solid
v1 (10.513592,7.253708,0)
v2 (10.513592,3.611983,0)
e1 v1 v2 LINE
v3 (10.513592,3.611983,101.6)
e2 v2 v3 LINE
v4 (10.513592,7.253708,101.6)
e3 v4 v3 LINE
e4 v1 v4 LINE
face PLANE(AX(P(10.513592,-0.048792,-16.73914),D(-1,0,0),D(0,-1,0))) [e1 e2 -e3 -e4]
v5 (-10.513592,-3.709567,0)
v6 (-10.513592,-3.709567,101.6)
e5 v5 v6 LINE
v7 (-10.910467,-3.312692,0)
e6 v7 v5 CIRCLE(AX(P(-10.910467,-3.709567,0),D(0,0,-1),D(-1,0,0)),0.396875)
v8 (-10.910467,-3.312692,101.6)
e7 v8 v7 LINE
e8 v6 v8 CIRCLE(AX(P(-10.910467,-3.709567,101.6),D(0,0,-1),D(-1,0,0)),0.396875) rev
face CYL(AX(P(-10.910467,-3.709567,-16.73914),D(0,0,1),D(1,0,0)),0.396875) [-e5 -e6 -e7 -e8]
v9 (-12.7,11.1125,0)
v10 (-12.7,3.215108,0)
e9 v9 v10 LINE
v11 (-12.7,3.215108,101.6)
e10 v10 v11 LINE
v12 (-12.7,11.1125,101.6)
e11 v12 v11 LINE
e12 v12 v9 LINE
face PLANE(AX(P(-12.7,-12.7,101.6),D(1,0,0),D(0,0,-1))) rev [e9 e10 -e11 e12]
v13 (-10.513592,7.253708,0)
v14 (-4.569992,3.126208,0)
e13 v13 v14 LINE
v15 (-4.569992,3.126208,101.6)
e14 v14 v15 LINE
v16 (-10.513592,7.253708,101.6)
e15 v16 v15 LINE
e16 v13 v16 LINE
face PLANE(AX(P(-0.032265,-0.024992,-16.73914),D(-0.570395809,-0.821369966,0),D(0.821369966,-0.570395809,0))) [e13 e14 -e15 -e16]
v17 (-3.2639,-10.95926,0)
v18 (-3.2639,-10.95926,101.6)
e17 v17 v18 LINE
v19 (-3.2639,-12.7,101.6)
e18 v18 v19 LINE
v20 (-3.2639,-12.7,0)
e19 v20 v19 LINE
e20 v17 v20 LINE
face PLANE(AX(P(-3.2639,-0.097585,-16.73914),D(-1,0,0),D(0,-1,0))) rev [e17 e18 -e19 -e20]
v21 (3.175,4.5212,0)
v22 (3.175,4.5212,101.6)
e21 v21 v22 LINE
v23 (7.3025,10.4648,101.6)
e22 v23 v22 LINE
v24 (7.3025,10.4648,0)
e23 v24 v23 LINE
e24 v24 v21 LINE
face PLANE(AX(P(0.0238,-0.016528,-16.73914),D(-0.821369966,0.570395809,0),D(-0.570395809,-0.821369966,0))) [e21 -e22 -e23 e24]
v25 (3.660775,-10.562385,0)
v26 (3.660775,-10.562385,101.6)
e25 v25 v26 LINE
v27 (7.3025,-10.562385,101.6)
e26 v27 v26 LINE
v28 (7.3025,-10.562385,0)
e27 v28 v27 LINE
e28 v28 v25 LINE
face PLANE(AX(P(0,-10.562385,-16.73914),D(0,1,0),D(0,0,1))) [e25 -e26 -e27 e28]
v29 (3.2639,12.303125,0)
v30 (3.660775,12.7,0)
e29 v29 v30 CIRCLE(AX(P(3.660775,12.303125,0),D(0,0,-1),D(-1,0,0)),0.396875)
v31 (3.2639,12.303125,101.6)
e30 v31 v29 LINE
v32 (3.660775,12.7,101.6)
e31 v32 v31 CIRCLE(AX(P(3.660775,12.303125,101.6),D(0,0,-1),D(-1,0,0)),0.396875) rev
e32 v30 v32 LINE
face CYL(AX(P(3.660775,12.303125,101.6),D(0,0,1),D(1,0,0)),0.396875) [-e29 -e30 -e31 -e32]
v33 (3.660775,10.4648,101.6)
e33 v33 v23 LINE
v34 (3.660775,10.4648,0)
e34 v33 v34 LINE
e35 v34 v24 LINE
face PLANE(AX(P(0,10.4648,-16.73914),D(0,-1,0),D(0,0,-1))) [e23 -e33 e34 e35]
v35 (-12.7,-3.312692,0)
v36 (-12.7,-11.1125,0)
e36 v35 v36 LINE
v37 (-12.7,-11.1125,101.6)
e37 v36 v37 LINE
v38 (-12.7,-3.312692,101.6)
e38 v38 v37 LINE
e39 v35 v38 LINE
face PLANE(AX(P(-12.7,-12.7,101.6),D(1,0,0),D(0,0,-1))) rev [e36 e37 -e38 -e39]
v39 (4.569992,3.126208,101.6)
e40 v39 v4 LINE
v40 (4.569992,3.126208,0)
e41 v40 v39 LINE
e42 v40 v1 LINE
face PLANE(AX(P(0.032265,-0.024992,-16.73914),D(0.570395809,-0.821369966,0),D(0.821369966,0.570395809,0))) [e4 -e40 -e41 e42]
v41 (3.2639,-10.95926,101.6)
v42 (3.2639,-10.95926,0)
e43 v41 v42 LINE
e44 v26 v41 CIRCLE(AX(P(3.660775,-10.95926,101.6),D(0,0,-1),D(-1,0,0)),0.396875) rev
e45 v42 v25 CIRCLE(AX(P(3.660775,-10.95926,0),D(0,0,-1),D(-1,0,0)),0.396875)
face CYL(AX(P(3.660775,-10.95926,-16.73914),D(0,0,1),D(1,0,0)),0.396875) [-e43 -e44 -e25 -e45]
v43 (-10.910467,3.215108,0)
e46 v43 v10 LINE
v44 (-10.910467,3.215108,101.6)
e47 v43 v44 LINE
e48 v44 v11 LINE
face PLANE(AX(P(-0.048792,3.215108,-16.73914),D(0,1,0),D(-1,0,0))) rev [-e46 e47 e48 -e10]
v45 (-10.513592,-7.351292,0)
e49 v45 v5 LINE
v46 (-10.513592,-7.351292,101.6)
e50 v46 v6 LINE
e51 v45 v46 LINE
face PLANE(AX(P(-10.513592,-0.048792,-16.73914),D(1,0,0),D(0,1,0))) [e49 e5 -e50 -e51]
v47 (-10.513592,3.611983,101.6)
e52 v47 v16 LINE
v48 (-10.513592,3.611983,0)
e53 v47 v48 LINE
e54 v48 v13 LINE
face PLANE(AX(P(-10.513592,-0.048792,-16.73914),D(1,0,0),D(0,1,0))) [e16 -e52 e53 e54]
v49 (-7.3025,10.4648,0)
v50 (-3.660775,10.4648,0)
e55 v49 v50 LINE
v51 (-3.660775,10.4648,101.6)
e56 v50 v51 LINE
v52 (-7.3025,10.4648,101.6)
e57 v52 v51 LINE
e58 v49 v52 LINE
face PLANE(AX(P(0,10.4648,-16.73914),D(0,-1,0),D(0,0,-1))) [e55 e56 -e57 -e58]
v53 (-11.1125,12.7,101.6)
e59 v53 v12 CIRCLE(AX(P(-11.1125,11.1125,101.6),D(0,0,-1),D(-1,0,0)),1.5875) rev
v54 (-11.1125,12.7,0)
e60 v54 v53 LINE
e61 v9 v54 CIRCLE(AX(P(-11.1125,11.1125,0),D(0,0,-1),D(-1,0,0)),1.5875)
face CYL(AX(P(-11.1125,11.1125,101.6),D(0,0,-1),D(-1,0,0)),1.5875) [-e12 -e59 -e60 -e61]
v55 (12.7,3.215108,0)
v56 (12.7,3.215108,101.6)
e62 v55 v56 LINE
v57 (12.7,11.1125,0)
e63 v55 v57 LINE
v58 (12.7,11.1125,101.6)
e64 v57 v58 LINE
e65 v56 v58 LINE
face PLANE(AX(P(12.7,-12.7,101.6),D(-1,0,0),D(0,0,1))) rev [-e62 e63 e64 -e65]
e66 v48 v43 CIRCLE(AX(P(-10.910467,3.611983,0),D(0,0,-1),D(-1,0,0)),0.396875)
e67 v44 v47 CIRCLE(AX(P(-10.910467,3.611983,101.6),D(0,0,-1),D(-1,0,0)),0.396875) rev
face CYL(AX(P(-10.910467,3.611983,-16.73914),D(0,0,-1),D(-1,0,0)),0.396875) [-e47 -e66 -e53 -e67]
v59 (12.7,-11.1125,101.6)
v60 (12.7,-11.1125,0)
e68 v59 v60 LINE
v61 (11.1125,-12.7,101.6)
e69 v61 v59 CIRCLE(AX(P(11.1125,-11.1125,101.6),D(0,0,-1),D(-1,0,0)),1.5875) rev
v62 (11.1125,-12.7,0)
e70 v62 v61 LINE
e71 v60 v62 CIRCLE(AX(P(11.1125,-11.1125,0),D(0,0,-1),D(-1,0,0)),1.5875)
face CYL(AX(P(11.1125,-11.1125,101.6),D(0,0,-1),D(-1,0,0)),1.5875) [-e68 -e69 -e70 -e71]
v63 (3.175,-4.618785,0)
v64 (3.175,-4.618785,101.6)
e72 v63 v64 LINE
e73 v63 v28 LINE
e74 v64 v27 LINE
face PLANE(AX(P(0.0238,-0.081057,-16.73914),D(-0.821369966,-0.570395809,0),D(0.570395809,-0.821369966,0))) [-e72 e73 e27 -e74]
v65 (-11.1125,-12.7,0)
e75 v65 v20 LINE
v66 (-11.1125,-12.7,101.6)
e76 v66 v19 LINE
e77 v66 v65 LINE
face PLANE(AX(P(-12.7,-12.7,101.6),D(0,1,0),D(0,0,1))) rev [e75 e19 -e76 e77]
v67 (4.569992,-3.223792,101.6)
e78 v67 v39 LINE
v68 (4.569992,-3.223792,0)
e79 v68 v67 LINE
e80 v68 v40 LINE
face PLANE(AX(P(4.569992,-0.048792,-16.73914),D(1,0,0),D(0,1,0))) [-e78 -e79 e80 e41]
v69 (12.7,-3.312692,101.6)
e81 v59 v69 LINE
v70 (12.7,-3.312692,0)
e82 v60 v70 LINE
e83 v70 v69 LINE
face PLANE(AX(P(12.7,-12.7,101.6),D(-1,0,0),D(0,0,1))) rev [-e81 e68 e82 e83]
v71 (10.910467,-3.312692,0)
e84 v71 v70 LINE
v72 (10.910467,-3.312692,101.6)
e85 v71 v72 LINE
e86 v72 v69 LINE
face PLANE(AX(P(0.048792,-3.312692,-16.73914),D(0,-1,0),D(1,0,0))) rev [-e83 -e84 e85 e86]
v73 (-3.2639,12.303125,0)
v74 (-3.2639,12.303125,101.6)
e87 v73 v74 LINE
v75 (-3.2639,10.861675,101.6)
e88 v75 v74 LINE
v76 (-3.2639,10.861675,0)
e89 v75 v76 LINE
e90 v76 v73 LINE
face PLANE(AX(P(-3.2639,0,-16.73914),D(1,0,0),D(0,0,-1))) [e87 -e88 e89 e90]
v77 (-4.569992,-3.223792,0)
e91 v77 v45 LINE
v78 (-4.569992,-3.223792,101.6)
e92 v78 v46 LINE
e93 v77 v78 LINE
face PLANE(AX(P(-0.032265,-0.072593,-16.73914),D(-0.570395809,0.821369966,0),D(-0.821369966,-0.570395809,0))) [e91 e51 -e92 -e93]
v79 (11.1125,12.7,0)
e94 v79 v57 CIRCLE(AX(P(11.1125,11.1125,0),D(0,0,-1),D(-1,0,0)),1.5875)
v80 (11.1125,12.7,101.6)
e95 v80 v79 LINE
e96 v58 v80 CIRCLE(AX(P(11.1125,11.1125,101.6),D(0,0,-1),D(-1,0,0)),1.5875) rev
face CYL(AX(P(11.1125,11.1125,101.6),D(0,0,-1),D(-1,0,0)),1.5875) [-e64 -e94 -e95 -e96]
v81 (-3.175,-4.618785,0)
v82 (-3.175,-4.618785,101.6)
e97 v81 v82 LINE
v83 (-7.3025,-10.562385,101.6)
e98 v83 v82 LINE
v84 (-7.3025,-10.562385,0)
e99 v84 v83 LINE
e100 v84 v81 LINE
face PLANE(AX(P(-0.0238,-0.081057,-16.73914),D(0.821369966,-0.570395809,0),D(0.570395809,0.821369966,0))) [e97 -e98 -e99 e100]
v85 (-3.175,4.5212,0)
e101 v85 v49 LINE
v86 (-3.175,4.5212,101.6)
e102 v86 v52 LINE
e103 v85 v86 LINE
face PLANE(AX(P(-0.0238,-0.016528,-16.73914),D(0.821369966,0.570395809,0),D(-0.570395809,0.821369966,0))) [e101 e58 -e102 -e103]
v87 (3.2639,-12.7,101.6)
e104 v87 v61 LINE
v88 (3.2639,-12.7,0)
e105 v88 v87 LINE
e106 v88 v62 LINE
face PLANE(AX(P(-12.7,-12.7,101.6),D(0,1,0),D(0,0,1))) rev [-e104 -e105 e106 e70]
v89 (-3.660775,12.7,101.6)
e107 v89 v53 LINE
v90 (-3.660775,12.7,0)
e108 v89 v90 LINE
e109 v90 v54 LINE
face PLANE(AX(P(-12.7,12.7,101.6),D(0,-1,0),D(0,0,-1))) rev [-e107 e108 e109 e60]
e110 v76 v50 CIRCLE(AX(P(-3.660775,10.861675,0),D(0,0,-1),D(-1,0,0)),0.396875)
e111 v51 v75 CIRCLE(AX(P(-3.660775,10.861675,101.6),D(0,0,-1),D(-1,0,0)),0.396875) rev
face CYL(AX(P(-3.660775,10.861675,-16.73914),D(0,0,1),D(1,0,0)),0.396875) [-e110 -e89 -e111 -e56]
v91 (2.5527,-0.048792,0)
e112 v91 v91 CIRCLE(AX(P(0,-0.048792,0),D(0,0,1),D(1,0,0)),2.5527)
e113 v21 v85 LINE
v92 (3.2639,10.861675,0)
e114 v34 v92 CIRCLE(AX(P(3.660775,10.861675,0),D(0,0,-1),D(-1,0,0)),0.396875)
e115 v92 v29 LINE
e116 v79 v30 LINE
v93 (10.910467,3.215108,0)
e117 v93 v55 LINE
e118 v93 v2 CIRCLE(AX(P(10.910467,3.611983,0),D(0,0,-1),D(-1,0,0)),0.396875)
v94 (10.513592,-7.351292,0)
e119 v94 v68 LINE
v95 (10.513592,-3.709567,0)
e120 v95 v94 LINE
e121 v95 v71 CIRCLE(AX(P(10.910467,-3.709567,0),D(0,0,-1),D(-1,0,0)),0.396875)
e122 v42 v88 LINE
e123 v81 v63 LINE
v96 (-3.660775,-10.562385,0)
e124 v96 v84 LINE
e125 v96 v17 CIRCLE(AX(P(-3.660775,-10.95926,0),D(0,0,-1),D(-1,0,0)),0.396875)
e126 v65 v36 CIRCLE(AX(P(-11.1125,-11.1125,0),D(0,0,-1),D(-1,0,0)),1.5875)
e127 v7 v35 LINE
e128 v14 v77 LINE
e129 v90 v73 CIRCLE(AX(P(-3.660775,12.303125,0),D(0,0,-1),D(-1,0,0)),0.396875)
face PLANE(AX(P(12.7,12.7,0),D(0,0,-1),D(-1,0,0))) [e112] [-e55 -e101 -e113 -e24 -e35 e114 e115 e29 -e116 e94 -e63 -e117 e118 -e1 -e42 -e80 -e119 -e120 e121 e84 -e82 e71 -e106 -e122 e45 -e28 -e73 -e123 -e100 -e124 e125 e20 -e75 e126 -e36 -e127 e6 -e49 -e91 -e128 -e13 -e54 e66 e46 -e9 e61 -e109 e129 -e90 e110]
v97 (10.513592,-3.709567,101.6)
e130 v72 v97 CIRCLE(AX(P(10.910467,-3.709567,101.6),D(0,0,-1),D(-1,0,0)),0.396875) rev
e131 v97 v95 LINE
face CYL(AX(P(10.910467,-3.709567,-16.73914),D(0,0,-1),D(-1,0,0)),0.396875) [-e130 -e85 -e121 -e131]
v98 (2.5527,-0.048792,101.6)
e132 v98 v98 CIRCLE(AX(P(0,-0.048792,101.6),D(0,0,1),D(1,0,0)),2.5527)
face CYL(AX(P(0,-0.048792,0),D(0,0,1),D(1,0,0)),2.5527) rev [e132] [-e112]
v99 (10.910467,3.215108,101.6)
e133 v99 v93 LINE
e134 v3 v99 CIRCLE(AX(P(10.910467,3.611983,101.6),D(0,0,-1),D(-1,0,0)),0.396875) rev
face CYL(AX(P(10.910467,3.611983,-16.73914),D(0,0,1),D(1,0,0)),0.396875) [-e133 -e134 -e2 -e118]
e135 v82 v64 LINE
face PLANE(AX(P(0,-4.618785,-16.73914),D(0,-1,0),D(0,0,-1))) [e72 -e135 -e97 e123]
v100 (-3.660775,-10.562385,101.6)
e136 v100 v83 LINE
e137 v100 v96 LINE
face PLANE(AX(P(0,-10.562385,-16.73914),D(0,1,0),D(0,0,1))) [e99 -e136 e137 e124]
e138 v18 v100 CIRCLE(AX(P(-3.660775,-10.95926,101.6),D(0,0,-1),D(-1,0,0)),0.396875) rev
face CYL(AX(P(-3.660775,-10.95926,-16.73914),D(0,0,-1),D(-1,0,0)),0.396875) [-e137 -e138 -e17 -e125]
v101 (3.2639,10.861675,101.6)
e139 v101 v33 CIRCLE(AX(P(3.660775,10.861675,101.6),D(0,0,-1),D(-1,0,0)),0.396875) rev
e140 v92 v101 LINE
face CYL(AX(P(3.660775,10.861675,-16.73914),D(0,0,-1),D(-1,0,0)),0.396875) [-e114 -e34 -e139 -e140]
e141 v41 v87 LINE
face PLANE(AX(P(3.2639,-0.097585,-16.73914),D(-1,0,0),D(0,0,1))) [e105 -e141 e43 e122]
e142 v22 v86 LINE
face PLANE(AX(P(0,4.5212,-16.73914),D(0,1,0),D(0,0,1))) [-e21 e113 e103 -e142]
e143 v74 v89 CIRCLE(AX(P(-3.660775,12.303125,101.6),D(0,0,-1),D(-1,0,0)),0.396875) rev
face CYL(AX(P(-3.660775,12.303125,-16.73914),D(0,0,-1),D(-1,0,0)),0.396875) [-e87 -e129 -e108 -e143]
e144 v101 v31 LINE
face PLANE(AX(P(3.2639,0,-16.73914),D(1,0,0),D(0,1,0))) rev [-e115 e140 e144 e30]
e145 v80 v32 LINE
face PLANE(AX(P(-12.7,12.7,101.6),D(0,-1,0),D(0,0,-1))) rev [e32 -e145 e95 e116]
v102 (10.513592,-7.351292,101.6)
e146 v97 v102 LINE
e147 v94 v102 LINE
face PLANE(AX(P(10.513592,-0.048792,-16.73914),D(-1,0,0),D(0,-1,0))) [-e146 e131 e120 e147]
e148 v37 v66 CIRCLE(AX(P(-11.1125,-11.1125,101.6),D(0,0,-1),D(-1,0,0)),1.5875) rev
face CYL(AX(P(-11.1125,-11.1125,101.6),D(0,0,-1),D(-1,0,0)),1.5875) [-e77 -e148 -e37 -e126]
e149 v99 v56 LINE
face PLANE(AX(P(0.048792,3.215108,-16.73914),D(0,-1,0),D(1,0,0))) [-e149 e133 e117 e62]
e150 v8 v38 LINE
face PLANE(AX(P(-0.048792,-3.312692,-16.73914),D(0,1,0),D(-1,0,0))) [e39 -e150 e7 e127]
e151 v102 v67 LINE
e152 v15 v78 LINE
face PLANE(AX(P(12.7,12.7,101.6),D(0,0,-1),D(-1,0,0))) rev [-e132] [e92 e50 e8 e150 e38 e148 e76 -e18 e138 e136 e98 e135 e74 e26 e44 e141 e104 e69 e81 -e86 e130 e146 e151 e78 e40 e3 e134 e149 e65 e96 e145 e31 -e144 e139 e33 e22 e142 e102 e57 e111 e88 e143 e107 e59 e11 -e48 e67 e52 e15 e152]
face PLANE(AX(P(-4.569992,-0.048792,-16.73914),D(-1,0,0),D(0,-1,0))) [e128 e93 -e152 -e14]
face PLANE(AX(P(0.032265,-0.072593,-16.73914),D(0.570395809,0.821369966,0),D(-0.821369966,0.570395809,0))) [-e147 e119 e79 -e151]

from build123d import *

# Parameters (mm, degrees)
SKETCH1_W                   = 25.4
SKETCH1_H                   = 25.4
BOSS_EXTRUDE1_DEPTH         = 101.6
FILLET1_R                   = 1.5875
HOLE1_OUTLINE_R             = 2.5527
HOLE1_DEPTH                 = 101.6
SKETCH7_W                   = 6.5278
SKETCH7_H                   = 2.2352
CUT_EXTRUDE2_DEPTH          = 101.6
FILLET4_R                   = 0.396875
CIRPATTERN2_DEPTH           = 101.6
F_1_4_20_TAPPED_HOLE1_D     = 5.1054
F_1_4_20_TAPPED_HOLE1_DEPTH = 6.35
F_1_4_20_TAPPED_HOLE1_TIP   = 1.533816902


# Read off the part's stored shape, not the designer's step: Hole1, CirPattern2
with BuildPart() as part:
    # Sketch1 → Boss-Extrude1 (new body)
    with BuildSketch(Plane.XY):
        Rectangle(SKETCH1_W, SKETCH1_H)
    extrude(amount=BOSS_EXTRUDE1_DEPTH)

    # Fillet1
    fillet1_edges = [part.edges().sort_by_distance(p)[0] for p in [
        (12.7, -12.7, 50.8),
        (-12.7, -12.7, 50.8),
        (-12.7, 12.7, 50.8),
        (12.7, 12.7, 50.8),
    ]]
    fillet(fillet1_edges, radius=FILLET1_R)

    # Hole1 outline → Hole1 (cut)
    with BuildSketch(Plane.XY):
        with Locations((0, -0.048792482)):
            Circle(HOLE1_OUTLINE_R)
    extrude(amount=HOLE1_DEPTH, mode=Mode.SUBTRACT)

    # Sketch7 → Cut-Extrude2 (cut)
    with BuildSketch(Plane.XY.offset(101.6)):
        with Locations((0, 11.5824)):
            Rectangle(SKETCH7_W, SKETCH7_H)
        Polygon((-3.175, 4.5212), (-7.3025, 10.4648), (7.3025, 10.4648), (3.175, 4.5212), align=None)
    extrude(amount=-CUT_EXTRUDE2_DEPTH, mode=Mode.SUBTRACT)

    # Fillet4
    fillet4_edges = [part.edges().sort_by_distance(p)[0] for p in [
        (-3.2639, 10.4648, 50.8),
        (-3.2639, 12.7, 50.8),
        (3.2639, 12.7, 50.8),
        (3.2639, 10.4648, 50.8),
    ]]
    fillet(fillet4_edges, radius=FILLET4_R)

    # CirPattern2 outline → CirPattern2 (cut)
    with BuildSketch(Plane.XY):
        with BuildLine():
            ThreePointArc((-3.660775, -10.562384964), (-3.380141996, -10.67862696), (-3.2639, -10.959259964))
            Line((-3.2639, -10.959259964), (-3.2639, -12.7))
            Line((-3.2639, -12.7), (3.2639, -12.7))
            Line((3.2639, -12.7), (3.2639, -10.959259964))
            ThreePointArc((3.2639, -10.959259964), (3.380141996, -10.67862696), (3.660775, -10.562384964))
            Line((3.660775, -10.562384964), (7.3025, -10.562384964))
            Line((7.3025, -10.562384964), (3.175, -4.618784964))
            Line((3.175, -4.618784964), (-3.175, -4.618784964))
            Line((-3.175, -4.618784964), (-7.3025, -10.562384964))
            Line((-7.3025, -10.562384964), (-3.660775, -10.562384964))
        make_face()
        with BuildLine():
            Line((-12.7, -3.312692482), (-10.910467482, -3.312692482))
            ThreePointArc((-10.910467482, -3.312692482), (-10.629834478, -3.428934478), (-10.513592482, -3.709567482))
            Line((-10.513592482, -3.709567482), (-10.513592482, -7.351292482))
            Line((-10.513592482, -7.351292482), (-4.569992482, -3.223792482))
            Line((-4.569992482, -3.223792482), (-4.569992482, 3.126207518))
            Line((-4.569992482, 3.126207518), (-10.513592482, 7.253707518))
            Line((-10.513592482, 7.253707518), (-10.513592482, 3.611982518))
            ThreePointArc((-10.513592482, 3.611982518), (-10.629834478, 3.331349514), (-10.910467482, 3.215107518))
            Line((-10.910467482, 3.215107518), (-12.7, 3.215107518))
            Line((-12.7, 3.215107518), (-12.7, -3.312692482))
        make_face()
        with BuildLine():
            ThreePointArc((10.513592482, -3.709567482), (10.629834478, -3.428934478), (10.910467482, -3.312692482))
            Line((10.910467482, -3.312692482), (12.7, -3.312692482))
            Line((12.7, -3.312692482), (12.7, 3.215107518))
            Line((12.7, 3.215107518), (10.910467482, 3.215107518))
            ThreePointArc((10.910467482, 3.215107518), (10.629834478, 3.331349514), (10.513592482, 3.611982518))
            Line((10.513592482, 3.611982518), (10.513592482, 7.253707518))
            Line((10.513592482, 7.253707518), (4.569992482, 3.126207518))
            Line((4.569992482, 3.126207518), (4.569992482, -3.223792482))
            Line((4.569992482, -3.223792482), (10.513592482, -7.351292482))
            Line((10.513592482, -7.351292482), (10.513592482, -3.709567482))
        make_face()
    extrude(amount=CIRPATTERN2_DEPTH, mode=Mode.SUBTRACT)

    # 1/4-20 Tapped Hole1
    with Locations(Plane(origin=(0, -0.048792482, 101.6), x_dir=(1, 0, 0), z_dir=(0, 0, 1))):
        with Locations((0, 0)):
            Hole(F_1_4_20_TAPPED_HOLE1_D / 2, depth=F_1_4_20_TAPPED_HOLE1_DEPTH)
            with Locations((0, 0, -(F_1_4_20_TAPPED_HOLE1_DEPTH + F_1_4_20_TAPPED_HOLE1_TIP / 2))):  # 118° drill point
                Cone(0, F_1_4_20_TAPPED_HOLE1_D / 2, F_1_4_20_TAPPED_HOLE1_TIP, mode=Mode.SUBTRACT)


solid = part.part
